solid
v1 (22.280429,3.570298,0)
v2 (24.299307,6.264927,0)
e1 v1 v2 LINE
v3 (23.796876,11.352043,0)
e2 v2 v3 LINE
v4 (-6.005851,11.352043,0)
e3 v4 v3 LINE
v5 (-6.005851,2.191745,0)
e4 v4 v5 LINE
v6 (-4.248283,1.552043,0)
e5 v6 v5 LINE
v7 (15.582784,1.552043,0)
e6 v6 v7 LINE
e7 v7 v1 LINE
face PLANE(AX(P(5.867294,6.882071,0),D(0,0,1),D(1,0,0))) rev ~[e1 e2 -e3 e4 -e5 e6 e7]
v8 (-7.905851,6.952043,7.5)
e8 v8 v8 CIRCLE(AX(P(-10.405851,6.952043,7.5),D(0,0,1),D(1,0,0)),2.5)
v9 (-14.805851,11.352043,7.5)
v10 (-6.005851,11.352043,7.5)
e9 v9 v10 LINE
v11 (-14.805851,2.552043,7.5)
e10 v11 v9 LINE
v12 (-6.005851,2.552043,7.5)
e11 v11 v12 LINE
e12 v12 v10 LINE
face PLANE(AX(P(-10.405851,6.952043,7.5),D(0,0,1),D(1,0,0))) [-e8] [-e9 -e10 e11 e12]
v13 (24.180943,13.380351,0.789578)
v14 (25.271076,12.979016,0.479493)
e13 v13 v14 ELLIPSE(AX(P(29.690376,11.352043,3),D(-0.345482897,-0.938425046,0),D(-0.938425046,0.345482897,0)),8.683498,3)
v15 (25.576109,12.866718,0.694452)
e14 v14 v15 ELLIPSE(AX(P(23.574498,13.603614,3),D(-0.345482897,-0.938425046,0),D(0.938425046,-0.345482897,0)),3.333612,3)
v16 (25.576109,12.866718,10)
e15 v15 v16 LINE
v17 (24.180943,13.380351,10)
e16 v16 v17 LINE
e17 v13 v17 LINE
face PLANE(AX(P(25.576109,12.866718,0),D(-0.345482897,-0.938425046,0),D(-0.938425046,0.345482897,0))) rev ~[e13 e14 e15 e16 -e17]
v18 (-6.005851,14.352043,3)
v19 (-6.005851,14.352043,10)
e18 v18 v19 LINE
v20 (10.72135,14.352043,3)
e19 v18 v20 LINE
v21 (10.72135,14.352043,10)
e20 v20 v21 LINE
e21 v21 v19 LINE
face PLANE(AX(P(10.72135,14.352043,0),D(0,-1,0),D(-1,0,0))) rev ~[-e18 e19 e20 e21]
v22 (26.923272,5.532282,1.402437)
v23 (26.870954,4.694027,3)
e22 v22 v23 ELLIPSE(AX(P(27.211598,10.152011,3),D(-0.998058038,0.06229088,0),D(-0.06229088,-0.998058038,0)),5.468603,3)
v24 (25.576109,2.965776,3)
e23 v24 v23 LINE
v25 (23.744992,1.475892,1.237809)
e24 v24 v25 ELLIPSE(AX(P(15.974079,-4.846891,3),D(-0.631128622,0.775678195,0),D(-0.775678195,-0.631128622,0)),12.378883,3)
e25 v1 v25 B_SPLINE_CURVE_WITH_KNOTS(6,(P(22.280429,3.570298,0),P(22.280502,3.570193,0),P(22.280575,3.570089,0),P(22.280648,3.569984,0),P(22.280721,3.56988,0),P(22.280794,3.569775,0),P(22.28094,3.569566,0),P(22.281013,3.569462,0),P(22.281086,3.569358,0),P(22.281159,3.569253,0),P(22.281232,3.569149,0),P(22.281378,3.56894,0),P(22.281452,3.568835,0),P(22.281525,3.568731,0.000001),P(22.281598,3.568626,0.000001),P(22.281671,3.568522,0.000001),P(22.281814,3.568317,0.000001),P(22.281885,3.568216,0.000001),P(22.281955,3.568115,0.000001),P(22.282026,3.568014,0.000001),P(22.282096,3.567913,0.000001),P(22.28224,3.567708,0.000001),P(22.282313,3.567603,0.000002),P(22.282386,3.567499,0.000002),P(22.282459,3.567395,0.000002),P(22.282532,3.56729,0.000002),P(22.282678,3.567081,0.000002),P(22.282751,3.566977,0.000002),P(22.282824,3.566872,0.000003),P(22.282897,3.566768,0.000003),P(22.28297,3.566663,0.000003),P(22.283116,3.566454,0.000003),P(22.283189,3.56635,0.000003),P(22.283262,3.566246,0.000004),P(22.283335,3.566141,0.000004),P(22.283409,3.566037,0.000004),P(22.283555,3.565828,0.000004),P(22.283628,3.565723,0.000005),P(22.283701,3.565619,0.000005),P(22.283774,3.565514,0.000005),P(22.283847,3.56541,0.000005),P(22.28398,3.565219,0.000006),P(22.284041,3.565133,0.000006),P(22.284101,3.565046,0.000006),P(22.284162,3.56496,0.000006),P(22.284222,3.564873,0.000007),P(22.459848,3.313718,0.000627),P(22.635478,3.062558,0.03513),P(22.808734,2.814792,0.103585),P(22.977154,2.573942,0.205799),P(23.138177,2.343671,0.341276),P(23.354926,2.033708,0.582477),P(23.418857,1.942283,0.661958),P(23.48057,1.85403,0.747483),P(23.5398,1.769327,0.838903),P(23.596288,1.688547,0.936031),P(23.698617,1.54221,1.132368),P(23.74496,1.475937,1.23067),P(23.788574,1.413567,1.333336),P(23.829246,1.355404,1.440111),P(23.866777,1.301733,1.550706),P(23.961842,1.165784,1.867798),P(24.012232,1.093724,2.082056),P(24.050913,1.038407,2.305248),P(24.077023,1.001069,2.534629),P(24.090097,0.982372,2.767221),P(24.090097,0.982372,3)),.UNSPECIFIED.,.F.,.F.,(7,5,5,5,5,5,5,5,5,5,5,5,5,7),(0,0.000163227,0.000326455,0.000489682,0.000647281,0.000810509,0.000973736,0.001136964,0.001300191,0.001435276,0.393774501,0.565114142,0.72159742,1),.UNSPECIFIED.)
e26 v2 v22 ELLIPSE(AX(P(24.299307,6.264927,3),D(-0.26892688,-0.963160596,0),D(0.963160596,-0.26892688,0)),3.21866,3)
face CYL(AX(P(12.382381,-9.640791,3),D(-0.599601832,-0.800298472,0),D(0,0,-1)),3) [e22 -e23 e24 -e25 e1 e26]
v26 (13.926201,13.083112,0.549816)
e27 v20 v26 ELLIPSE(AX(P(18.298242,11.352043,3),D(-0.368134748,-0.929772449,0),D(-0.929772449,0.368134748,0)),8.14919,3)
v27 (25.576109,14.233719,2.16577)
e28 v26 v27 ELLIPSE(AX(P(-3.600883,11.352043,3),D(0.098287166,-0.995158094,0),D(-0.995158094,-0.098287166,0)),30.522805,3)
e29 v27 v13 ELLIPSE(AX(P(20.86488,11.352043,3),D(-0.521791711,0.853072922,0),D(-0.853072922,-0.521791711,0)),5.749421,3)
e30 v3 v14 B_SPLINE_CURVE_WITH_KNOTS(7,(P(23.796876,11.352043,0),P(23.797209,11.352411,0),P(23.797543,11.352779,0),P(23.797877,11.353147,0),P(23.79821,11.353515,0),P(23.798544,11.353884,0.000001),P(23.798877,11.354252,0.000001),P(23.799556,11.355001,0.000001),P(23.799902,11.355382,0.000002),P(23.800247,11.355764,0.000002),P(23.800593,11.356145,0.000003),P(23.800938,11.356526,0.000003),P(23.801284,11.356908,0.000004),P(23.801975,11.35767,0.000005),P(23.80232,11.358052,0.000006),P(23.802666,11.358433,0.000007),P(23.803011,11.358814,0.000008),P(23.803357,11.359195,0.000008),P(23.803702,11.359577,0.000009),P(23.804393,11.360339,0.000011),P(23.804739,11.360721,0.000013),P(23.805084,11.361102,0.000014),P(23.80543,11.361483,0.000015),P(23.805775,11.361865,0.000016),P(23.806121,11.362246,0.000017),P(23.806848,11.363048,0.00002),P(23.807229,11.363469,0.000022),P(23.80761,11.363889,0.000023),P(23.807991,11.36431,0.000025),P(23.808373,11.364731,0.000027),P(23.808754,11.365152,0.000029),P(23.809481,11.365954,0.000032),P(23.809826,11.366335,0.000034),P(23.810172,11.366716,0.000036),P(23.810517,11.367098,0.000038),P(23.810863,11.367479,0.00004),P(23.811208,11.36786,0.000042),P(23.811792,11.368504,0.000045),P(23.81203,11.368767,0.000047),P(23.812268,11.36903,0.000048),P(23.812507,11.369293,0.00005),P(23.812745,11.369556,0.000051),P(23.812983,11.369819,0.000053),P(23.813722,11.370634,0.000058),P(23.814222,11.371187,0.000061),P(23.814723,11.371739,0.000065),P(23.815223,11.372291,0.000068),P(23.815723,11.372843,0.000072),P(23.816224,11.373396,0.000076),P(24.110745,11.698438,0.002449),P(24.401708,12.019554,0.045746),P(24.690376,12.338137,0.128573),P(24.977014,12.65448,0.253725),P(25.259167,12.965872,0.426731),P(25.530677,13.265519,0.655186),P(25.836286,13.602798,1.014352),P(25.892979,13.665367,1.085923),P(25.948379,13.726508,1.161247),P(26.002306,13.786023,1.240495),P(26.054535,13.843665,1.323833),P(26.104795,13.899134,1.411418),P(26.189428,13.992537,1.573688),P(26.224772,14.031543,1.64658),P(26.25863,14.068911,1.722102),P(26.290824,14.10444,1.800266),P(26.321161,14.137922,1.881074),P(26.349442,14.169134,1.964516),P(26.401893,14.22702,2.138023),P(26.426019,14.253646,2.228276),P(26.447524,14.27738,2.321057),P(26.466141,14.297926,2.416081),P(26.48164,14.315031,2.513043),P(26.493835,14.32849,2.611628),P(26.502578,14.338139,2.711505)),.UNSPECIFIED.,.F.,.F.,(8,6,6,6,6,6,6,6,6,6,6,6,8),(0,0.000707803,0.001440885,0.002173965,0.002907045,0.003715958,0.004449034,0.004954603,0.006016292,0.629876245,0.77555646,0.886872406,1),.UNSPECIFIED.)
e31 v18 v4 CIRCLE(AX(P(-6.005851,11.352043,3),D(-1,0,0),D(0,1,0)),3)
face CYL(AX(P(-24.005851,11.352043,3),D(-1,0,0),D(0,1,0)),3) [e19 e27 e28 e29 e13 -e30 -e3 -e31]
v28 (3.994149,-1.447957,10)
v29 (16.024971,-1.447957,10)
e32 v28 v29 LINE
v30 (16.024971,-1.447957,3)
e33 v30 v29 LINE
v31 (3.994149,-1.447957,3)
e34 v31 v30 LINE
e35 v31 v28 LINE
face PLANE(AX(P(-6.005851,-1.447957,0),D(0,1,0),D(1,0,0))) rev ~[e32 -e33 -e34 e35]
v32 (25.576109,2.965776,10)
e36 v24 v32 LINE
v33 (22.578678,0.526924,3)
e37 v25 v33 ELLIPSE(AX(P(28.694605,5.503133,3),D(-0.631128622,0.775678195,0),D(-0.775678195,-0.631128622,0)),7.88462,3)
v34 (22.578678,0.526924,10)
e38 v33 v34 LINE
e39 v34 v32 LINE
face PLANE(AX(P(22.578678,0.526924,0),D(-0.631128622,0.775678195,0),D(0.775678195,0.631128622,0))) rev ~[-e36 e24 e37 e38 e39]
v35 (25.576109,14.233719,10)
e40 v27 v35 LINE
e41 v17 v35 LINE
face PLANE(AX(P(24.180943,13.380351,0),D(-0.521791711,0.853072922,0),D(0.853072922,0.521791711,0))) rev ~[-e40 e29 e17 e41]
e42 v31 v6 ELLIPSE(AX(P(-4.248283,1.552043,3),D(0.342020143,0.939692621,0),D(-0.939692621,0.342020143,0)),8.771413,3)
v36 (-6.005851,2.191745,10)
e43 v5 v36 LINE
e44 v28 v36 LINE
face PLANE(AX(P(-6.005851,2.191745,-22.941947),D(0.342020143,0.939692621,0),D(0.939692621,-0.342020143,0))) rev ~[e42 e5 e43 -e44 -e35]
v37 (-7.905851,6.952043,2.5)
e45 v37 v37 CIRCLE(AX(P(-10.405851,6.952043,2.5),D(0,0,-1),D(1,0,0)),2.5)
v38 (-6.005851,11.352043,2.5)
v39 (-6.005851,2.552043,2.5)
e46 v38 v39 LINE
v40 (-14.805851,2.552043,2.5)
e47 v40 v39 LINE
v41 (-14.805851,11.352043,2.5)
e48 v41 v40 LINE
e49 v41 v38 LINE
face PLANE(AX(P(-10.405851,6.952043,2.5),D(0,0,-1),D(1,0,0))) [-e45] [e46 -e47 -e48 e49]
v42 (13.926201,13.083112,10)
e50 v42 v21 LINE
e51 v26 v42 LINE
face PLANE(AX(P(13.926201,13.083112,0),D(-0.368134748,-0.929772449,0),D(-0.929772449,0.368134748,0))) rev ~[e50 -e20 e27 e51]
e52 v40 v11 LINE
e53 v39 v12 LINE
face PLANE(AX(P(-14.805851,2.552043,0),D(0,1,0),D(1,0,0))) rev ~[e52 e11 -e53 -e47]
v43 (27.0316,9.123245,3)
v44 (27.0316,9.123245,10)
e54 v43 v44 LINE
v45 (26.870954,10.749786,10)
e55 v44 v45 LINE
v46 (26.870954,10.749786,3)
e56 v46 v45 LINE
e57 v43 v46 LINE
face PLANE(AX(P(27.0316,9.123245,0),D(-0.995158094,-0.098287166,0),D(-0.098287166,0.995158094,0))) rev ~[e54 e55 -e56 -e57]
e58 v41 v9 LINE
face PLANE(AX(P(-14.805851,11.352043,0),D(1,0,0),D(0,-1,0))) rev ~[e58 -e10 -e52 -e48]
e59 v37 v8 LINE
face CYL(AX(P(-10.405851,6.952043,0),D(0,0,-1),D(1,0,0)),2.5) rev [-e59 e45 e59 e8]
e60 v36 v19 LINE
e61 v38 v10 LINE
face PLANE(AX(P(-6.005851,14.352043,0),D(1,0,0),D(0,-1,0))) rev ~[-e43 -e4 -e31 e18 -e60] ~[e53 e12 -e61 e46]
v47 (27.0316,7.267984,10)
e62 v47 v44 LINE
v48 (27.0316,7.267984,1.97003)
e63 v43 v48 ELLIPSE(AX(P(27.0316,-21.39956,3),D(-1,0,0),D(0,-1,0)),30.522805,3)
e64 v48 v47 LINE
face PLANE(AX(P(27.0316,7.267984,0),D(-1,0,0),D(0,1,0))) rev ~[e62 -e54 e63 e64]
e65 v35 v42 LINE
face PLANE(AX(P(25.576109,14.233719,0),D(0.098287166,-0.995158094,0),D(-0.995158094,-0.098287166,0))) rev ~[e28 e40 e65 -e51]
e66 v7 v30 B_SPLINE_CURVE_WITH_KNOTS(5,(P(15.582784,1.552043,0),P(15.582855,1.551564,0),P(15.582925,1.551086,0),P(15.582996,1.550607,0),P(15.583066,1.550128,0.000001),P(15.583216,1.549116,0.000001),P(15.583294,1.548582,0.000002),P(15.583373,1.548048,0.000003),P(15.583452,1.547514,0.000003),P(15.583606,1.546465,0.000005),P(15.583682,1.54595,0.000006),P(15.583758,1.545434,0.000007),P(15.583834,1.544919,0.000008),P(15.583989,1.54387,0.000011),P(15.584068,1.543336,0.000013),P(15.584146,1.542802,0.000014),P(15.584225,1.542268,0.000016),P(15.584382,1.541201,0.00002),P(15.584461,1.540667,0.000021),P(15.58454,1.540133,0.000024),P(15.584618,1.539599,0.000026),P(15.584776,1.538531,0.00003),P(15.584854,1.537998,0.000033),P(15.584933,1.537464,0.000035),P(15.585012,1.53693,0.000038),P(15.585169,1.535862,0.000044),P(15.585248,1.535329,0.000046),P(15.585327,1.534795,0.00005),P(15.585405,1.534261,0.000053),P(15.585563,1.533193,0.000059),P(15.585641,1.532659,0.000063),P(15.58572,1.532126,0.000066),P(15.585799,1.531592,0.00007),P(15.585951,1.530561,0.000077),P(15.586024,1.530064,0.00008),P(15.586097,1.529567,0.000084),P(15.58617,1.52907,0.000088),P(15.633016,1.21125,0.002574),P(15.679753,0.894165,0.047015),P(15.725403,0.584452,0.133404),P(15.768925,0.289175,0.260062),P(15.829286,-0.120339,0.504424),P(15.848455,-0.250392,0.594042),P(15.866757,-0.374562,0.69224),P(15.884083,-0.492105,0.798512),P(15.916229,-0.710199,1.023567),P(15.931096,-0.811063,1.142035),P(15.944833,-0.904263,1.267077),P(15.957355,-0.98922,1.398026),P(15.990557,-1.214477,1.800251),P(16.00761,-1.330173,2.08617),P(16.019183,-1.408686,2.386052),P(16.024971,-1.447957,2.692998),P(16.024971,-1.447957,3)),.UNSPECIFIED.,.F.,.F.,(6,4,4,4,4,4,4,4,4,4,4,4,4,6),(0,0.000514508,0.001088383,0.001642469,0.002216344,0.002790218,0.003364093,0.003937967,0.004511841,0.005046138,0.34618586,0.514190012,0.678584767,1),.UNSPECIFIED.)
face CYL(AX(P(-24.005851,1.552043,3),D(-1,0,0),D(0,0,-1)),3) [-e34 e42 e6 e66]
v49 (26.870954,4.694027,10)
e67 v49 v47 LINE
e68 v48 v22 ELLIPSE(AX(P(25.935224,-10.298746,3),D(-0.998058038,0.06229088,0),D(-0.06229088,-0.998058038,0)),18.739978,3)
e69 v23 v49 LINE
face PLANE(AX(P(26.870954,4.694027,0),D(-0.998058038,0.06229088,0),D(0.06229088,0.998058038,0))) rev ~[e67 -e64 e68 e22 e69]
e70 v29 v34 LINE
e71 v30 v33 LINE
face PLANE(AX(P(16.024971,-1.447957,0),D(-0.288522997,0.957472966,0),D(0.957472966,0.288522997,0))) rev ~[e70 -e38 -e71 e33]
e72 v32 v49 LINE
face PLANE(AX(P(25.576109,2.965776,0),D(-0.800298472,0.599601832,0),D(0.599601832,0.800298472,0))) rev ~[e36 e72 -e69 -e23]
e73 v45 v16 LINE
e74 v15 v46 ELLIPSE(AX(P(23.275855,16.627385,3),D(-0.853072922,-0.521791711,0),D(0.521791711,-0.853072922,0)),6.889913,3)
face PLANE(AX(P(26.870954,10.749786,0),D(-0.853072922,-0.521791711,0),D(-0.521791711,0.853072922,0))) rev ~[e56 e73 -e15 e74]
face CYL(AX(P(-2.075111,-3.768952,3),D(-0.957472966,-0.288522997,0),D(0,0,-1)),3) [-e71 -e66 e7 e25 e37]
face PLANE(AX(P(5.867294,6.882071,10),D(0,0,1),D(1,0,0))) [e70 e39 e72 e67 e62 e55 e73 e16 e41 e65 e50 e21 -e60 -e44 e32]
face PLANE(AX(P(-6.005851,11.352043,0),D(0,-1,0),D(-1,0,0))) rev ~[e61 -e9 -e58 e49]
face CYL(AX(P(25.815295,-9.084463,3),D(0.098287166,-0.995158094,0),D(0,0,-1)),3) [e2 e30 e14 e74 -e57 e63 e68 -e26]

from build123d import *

# Parameters (mm, degrees)
F0_R        = 2.5
F1_DEPTH    = 10
F2_W        = 8.8
F2_H        = 8.8
F2_R        = 2.5
F3_DEPTH    = 2.5
F4_W        = 8.8
F4_H        = 8.8
F4_R        = 2.5
F5_DEPTH    = 2.5
F6_T1_DEPTH = 52.7272001401
F6_T3_DEPTH = 37.6344553761
F6_T5_DEPTH = 42.8447953281
F6_T7_DEPTH = 58.0308217405
F6_T9_DEPTH = 38.1595084339
F7_T1_DEPTH = 58.883894651


# Not quite as in the source:
# - a fillet or chamfer that OpenCascade refuses, or shapes differently, is made with other operations: its cross-section is extruded or revolved along the edge and cut away or added


with BuildPart() as f1:
    # F0 (on Top) → F1 (new body)
    with BuildSketch(Plane.XY):
        Polygon((10.7213496009, 14.3520427298), (0, 14.3520427298), (-6.0058505391, 14.3520427298), (-6.0058505391, 11.3520427298), (-14.8058505391, 11.3520427298), (-14.8058505391, 2.5520427298), (-6.0058505391, 2.5520427298), (-6.0058505391, -1.4479572702), (0, -1.4479572702), (16.0249712014, -1.4479572702), (22.5786776848, 0.5269235903), (25.5761091025, 2.9657761595), (26.8709543148, 4.6940274585), (27.0316003021, 7.267983998), (27.0316003021, 9.1232445721), (26.8709543148, 10.7497860696), (25.5761091025, 12.8667177236), (24.1809434093, 13.3803505253), (25.5761091025, 14.2337194165), (13.9262006316, 13.0831117922), align=None)
        with Locations((-10.4058505391, 6.9520427298)):
            Circle(F0_R, mode=Mode.SUBTRACT)
    extrude(amount=F1_DEPTH)

    # F2 (on face) → F3 (cut)
    with BuildSketch(Plane.XY.offset(10)):
        with Locations((-10.4058505391, 6.9520427298)):
            Rectangle(F2_W, F2_H)
        with Locations((-10.4058505391, 6.9520427298)):
            Circle(F2_R, mode=Mode.SUBTRACT)
    extrude(amount=-F3_DEPTH, mode=Mode.SUBTRACT)

    # F4 (on face) → F5 (cut)
    with BuildSketch(Plane(origin=(0, 0, 0), x_dir=(1, 0, 0), z_dir=(0, 0, -1))):
        with Locations((-10.4058505391, -6.9520427298)):
            Rectangle(F4_W, F4_H)
        with Locations((-10.4058505391, -6.9520427298)):
            Circle(F4_R, mode=Mode.SUBTRACT)
    extrude(amount=-F5_DEPTH, mode=Mode.SUBTRACT)

    # F6: fillet of radius 3 on 5 edges, made by hand

    # F6_s2 → F6_t1 (cut)
    with BuildSketch(Plane.YZ.offset(-24.0058505391)):
        with BuildLine():
            ThreePointArc((14.3520427298, 3), (13.4733630734, 0.8786796564), (11.3520427298, 0))
            Line((11.3520427298, 0), (11.3520427298, -0.06))
            Line((11.3520427298, -0.06), (14.4120427298, -0.06))
            Line((14.4120427298, -0.06), (14.4120427298, 3))
            Line((14.4120427298, 3), (14.3520427298, 3))
        make_face()
    extrude(amount=F6_T1_DEPTH, mode=Mode.SUBTRACT)

    # F6_s4 → F6_t3 (cut)
    with BuildSketch(Plane(origin=(1.1379480439, -11.5217301503, 0), x_dir=(0, 0, 1), z_dir=(-0.0982871663, 0.9951580944, 0))):
        with BuildLine():
            ThreePointArc((0, 24.7974137027), (0.8786796564, 26.9187340462), (3, 27.7974137027))
            Line((3, 27.7974137027), (3, 27.8574137027))
            Line((3, 27.8574137027), (-0.06, 27.8574137027))
            Line((-0.06, 27.8574137027), (-0.06, 24.7974137027))
            Line((-0.06, 24.7974137027), (0, 24.7974137027))
        make_face()
    extrude(amount=F6_T3_DEPTH, mode=Mode.SUBTRACT)

    # F6_s6 → F6_t5 (cut)
    with BuildSketch(Plane(origin=(-2.9435517348, -0.8870040179, 0), x_dir=(0, 0, 1), z_dir=(0.9574729658, 0.2885229968, 0))):
        with BuildLine():
            ThreePointArc((0, 3.0099526564), (0.8786796564, 5.131273), (3, 6.0099526564))
            Line((3, 6.0099526564), (3, 6.0699526564))
            Line((3, 6.0699526564), (-0.06, 6.0699526564))
            Line((-0.06, 6.0699526564), (-0.06, 3.0099526564))
            Line((-0.06, 3.0099526564), (0, 3.0099526564))
        make_face()
    extrude(amount=F6_T5_DEPTH, mode=Mode.SUBTRACT)

    # F6_s8 → F6_t7 (cut)
    with BuildSketch(Plane.YZ.offset(-24.0058505391)):
        with BuildLine():
            ThreePointArc((1.5520427298, 0), (-0.5692776137, 0.8786796564), (-1.4479572702, 3))
            Line((-1.4479572702, 3), (-1.5079572702, 3))
            Line((-1.5079572702, 3), (-1.5079572702, -0.06))
            Line((-1.5079572702, -0.06), (1.5520427298, -0.06))
            Line((1.5520427298, -0.06), (1.5520427298, 0))
        make_face()
    extrude(amount=F6_T7_DEPTH, mode=Mode.SUBTRACT)

    # F6_s10 → F6_t9 (cut)
    with BuildSketch(Plane(origin=(-0.1744913342, -0.2328964668, 0), x_dir=(0, 0, 1), z_dir=(0.5996018316, 0.8002984715, 0))):
        with BuildLine():
            ThreePointArc((0, 15.6902362056), (0.8786796564, 17.8115565491), (3, 18.6902362056))
            Line((3, 18.6902362056), (3, 18.7502362056))
            Line((3, 18.7502362056), (-0.06, 18.7502362056))
            Line((-0.06, 18.7502362056), (-0.06, 15.6902362056))
            Line((-0.06, 15.6902362056), (0, 15.6902362056))
        make_face()
    extrude(amount=F6_T9_DEPTH, mode=Mode.SUBTRACT)

    # F7: chamfer of 10 x 3.6397023427 on 1 edges, made by hand

    # F7_s2 → F7_t1 (cut)
    with BuildSketch(Plane.XY.offset(-22.9419473255)):
        Polygon((-6.0058505391, 2.1917450725), (3.9941494609, -1.4479572702), (-6.0058505391, -1.4479572702), align=None)
    extrude(amount=F7_T1_DEPTH, mode=Mode.SUBTRACT)


solid = f1.part
